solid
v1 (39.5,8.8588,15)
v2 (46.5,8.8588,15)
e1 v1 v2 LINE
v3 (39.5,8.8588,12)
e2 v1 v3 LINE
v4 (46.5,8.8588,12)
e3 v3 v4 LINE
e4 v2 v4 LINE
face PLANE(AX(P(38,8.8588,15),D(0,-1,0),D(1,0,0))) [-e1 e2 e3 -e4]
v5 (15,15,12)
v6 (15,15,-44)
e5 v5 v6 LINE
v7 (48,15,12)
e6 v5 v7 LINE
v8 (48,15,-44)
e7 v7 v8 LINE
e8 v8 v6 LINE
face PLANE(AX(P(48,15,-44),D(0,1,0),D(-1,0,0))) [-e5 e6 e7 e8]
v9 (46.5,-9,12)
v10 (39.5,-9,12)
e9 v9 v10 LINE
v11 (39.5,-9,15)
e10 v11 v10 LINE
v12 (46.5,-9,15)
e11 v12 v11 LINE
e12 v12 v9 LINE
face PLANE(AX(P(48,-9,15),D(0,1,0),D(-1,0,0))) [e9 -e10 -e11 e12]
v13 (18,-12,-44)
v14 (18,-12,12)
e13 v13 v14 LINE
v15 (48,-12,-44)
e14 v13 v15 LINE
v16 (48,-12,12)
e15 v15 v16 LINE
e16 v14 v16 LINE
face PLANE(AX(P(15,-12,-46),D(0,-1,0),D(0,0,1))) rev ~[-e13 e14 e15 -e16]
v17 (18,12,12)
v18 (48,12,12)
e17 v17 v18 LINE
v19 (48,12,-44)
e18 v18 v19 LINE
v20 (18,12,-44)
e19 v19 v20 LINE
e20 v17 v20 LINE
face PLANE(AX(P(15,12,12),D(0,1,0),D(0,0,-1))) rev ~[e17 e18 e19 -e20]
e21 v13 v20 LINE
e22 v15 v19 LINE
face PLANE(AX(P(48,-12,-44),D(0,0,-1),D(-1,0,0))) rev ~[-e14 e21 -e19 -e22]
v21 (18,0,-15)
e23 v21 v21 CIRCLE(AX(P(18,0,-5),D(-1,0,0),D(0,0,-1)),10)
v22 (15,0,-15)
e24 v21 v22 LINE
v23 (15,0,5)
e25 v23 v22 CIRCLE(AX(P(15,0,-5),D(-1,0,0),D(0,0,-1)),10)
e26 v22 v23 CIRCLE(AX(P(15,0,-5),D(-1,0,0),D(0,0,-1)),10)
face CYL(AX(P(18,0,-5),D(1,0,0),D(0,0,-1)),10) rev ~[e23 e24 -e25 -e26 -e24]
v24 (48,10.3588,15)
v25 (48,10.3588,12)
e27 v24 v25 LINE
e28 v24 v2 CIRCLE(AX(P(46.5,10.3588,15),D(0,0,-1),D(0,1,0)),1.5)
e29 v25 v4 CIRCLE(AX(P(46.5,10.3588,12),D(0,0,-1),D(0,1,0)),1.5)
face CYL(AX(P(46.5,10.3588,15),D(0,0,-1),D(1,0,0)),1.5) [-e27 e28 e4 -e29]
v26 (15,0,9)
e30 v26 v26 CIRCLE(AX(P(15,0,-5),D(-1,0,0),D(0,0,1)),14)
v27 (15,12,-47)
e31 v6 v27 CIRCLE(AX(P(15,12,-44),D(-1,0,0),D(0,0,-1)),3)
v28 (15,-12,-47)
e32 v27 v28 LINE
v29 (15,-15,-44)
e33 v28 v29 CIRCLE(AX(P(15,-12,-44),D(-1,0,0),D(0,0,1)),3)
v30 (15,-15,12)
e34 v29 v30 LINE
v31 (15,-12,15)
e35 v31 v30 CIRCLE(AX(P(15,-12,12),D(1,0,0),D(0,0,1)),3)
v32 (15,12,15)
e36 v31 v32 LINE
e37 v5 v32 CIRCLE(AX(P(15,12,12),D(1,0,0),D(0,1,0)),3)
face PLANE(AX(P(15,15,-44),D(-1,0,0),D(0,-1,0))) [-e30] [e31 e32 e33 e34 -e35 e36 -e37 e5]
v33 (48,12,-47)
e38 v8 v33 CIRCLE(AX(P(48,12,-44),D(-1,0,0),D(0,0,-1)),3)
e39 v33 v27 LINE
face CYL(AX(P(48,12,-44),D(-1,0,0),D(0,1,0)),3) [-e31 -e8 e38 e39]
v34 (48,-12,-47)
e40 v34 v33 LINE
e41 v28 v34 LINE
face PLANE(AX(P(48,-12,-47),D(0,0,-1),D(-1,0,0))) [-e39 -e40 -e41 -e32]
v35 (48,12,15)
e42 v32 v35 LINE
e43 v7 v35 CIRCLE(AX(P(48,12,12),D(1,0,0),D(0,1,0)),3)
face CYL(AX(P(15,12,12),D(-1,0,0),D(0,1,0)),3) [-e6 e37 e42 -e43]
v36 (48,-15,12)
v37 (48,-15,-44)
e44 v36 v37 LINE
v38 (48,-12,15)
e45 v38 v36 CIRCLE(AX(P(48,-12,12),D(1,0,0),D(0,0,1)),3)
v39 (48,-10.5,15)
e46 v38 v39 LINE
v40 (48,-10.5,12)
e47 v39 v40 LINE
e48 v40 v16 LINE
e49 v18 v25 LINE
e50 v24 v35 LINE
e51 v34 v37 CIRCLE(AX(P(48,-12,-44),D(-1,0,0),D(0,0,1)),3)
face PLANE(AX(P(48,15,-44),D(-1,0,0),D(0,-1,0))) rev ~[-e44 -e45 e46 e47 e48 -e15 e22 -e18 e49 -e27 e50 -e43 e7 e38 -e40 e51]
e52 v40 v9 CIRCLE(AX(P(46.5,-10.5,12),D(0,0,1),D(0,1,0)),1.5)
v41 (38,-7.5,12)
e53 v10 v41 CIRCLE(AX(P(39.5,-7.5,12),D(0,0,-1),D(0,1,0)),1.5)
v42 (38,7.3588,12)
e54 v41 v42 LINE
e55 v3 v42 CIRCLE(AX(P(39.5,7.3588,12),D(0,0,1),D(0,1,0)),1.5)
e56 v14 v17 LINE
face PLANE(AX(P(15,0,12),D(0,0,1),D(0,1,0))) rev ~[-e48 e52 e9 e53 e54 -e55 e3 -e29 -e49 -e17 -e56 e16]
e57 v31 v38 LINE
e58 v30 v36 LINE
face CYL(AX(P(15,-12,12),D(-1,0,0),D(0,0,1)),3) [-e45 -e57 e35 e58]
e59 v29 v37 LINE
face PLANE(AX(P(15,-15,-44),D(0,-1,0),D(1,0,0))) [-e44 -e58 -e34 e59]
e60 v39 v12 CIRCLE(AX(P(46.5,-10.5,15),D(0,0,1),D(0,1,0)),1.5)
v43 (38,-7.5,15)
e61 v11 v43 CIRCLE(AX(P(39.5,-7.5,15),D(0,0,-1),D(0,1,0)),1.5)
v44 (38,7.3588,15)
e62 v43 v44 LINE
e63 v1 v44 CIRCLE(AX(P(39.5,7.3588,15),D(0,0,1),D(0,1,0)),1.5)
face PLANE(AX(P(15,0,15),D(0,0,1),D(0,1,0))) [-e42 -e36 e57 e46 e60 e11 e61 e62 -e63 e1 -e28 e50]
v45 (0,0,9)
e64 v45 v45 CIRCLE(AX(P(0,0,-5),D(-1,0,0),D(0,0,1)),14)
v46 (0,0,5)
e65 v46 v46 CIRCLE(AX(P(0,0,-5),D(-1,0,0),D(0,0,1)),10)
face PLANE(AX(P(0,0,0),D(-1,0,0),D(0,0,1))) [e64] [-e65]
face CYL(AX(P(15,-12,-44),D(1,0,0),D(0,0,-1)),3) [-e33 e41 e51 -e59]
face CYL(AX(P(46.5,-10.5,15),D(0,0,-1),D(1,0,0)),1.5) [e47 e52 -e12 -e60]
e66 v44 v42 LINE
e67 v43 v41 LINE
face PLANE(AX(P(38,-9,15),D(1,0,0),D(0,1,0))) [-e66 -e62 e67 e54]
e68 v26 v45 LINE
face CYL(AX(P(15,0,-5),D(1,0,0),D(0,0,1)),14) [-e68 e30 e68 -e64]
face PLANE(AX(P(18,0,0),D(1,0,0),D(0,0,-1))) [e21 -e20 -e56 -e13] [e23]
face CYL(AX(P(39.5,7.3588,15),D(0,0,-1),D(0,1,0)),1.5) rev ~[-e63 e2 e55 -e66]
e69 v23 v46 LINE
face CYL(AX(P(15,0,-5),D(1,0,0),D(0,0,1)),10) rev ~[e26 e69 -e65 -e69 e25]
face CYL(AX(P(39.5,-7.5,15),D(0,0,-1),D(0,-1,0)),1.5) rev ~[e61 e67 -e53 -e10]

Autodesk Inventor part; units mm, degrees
ref_plane "YZ Plane" through (0, 0, 0) normal (1, 0, 0) x (0, 1, 0)
ref_plane "XZ Plane" through (0, 0, 0) normal (0, 1, 0) x (-1, 0, 0)
ref_plane "XY Plane" through (0, 0, 0) normal (0, 0, 1) x (1, 0, 0)
sketch "Sketch1" plane through (0, 0, 0) normal (1, 0, 0) x (0, 1, 0)
  circle A0 centre (0, 0) radius 10
  circle A1 centre (0, 0) radius 14
  dimension "d0" = 20
  dimension "d1" = 28
extrude "Extrusion1" add sketch "Sketch1" along normal blind 15
sketch "Sketch2" plane through (15, 0, 0) normal (1, 0, 0) x (0, 0, -1)
  point P0 (0, 0)
sketch "Sketch3" plane through (15, 0, 0) normal (1, 0, 0) x (0, 0, -1)
  circle A0 centre (0, 0) radius 10 projected
  line L0 (-12, 0) -> (-12, 12)
  line L1 (-12, 12) -> (46, 12)
  line L2 (46, 12) -> (46, -12)
  line L3 (46, -12) -> (-12, -12)
  line L4 (-12, -12) -> (-12, 0)
  line L5 (-15, 0) -> (-15, -12)
  line L6 (-15, 0) -> (-15, 12)
  line L7 (-12, 15) -> (46, 15)
  line L8 (49, 12) -> (49, -12)
  line L9 (46, -15) -> (-12, -15)
  arc A1 (49, 12) -> (46, 15) centre (46, 12) ccw
  arc A2 (46, -15) -> (49, -12) centre (46, -12) ccw
  arc A3 (-15, -12) -> (-12, -15) centre (-12, -12) ccw
  arc A4 (-12, 15) -> (-15, 12) centre (-12, 12) ccw
extrude "Extrusion2" add sketch "Sketch3" along normal blind 33 contours L6 A4 L7 A1 L8 A2 L9 A3 L5
sketch "Sketch4" plane through (15, 0, 0) normal (1, 0, 0) x (0, 0, -1)
  line L0 (-12, -12) -> (-12, 12) projected
  line L1 (7.2111, 12) -> (46, 12) projected
  line L2 (-12, 12) -> (46, 12)
  line L3 (46, 12) -> (46, -12)
  line L4 (46, -12) -> (-12, -12) projected
  line L5 (46, -12) -> (-12, -12)
  line L6 (-12, 12) -> (46, 12) projected
  line L7 (-12, -12) -> (-12, 12)
  point P0 (0, 0)
extrude "Extrusion3" add sketch "Sketch4" along normal blind 3
sketch "Sketch5" plane through (15, 0, 0) normal (-1, 0, 0) x (0, 0, 1)
  circle A0 centre (0, 0) radius 10
extrude "Extrusion4" cut sketch "Sketch5" against normal blind 3
sketch "Sketch6" plane through (15, -12, -49) normal (0, 0, -1) x (-1, 0, 0)
  point P0 (15, 12)
sketch "Sketch7" plane through (15, -12, -49) normal (0, 0, -1) x (-1, 0, 0)
  line L0 (0, 0) -> (0, -3) projected
  line L1 (0, -3) -> (0, 27)
  point P0 (15, 12)
  dimension "d22" = 30
sketch "Sketch8" plane through (15, -12, -49) normal (0, 0, -1) x (-1, 0, 0)
  point P0 (0, -3)
  point P1 (-3, 0)
sketch "Sketch9" plane through (15, -12, -49) normal (0, 0, -1) x (-1, 0, 0)
  line L0 (0, 27) -> (0, 24) projected
  line L1 (0, 27) -> (-64, 27)
  line L2 (-64, 27) -> (-64, -3)
  line L3 (0, -3) -> (-33, -3) projected
  line L4 (-64, -3) -> (0, -3)
  line L5 (0, -3) -> (0, 27)
  line L6 (0, 0) -> (0, 24) projected
  line L7 (-3, 24) -> (-3, 0) projected
  line L8 (-3, 0) -> (-3, 24)
  line L9 (0, 24) -> (-33, 24) projected
  line L10 (-3, 24) -> (-61, 24)
  line L11 (-61, 24) -> (-61, 0)
  line L12 (-61, 0) -> (-3, 0)
  line L13 (0, 0) -> (-33, 0) projected
  point P0 (15, 12)
  dimension "d27" = 64
  dimension "d28" = 30
  dimension "d29" = 58
extrude "Extrusion5" add sketch "Sketch9" along normal blind 30 contours L0 L9 L10 L11 L12 L13 L5 L3 L4 L2 L1 | L5 L13 L7 L9
sketch "Sketch10" plane through (48, 12, -49) normal (0, 0, -1) x (-1, 0, 0)
  line L0 (33, 3) -> (-31, 3) projected
  line L1 (33, 3) -> (33, 0) projected
  line L2 (-31, 3) -> (33, 3)
  line L3 (33, 3) -> (33, -27)
  line L4 (33, 0) -> (33, -24) projected
  line L5 (-31, 3) -> (-31, -27) projected
  line L6 (33, -27) -> (-31, -27)
  line L7 (-31, -27) -> (-31, 3)
  point P0 (48, -12)
  dimension "d32" = 30
extrude "Extrusion6" add sketch "Sketch10" against normal blind 5
fillet "Fillet1" radius 3 2 edges at (79, 15, -61.5) (79, -15, -61.5)
sketch "Sketch11" plane through (48, 12, -44) normal (0, 0, 1) x (1, 0, 0)
  line L0 (31, -24) -> (31, 0) projected
  line L1 (31, -12) -> (29, -12)
  line L2 (29, -12) -> (19, -12)
  circle A0 centre (19, -12) radius 10
  point P0 (-48, -12)
  dimension "d36" = 2
  dimension "d37" = 10
extrude "Extrusion7" cut sketch "Sketch11" against normal blind 10.5
sketch "Sketch12" plane through (48, 12, -44) normal (0, 0, 1) x (1, 0, 0)
  arc A0 (28, -7.6411) -> (28, -16.3589) centre (19, -12) ccw projected
  circle A1 centre (19, -12) radius 10
  circle A2 centre (19, -12) radius 10 projected
  circle A3 centre (19, -12) radius 14
  point P0 (-48, -12)
  point P1 (28, -16.3589)
  dimension "d40" = 28
extrude "Extrusion8" add sketch "Sketch12" along normal blind 15
sketch "Sketch13" plane through (15, -12, 15) normal (0, 0, 1) x (1, 0, 0)
  line L0 (33, 0) -> (3, 0) projected
  line L1 (0, -3) -> (33, -3) projected
  line L2 (30.6116, 0) -> (33.6116, 0) construction
  line L3 (33, 0) -> (33, 24) projected
  line L4 (33, 3) -> (23, 3)
  line L5 (23, 3) -> (23, 20.8588)
  line L6 (23, 20.8588) -> (33, 20.8588)
  point P0 (-15, 12)
extrude "Extrusion9" cut sketch "Sketch13" against normal blind 21.75
sketch "Sketch14" plane through (79, -12, -79) normal (1, 0, 0) x (0, 0, -1)
  line L0 (-35, 24) -> (0, 24) projected
  line L1 (-3.7826, 24) -> (-0.7826, 24) construction
  line L2 (0, 0) -> (-35, 0) projected
  line L3 (-3.2489, 0) -> (-0.2489, 0) construction
  line L4 (0, 24) -> (0, 0) projected
  line L5 (0, 3) -> (-10, 3)
  line L6 (0, 3) -> (10, 3) construction
  line L7 (-10, 3) -> (-10, 21)
  line L8 (-10, 21) -> (0, 21)
  point P0 (-79, 12)
  dimension "d53" = 10
  dimension "d54" = 180
extrude "Extrusion10" cut sketch "Sketch14" against normal blind 25.75
sketch "Sketch15" plane through (15, -12, -79) normal (0, 0, -1) x (-1, 0, 0)
  line L0 (8.5716, 47.3564) -> (-2.6139, -49.713)
  line L1 (-2.6139, -49.713) -> (-66.1269, -32.0991)
  line L2 (-66.1269, -32.0991) -> (-83.6498, 8.8041)
  line L3 (-83.6498, 8.8041) -> (-71.64, 52.1092)
  line L4 (-71.64, 52.1092) -> (-17.9136, 47.3564)
  arc A0 (-17.9136, 47.3564) -> (-17.9136, 47.3564) centre (-16.407, 64.3867) ccw
  line L5 (-17.9136, 47.3564) -> (8.5716, 47.3564)
  point P0 (15, 12)
extrude "Extrusion11" cut sketch "Sketch15" against normal blind 30 contours L0 L1 L2 L3 L4 A0 L5 | A0 L5 picked at (-16.2394, 47.3367)
sketch "Sketch16" plane through (15, 15, 12) normal (0, 1, 0) x (1, 0, 0)
  line L0 (33, 56) -> (33, 0) projected
  line L1 (33, 35.3995) -> (33, 94.1554)
  line L2 (33, 94.1554) -> (79.7551, 84.127)
  line L3 (79.7551, 84.127) -> (69.5982, 12)
  line L4 (69.5982, 12) -> (67.3209, 12.3207)
  line L5 (67.3209, 12.3207) -> (33, 35.3995)
  point P0 (-15, 12)
extrude "Extrusion12" cut sketch "Sketch16" against normal blind 77.25
sketch "Sketch18" plane through (48, -15, -49) normal (0, 0, -1) x (-1, 0, 0)
  point P0 (48, 15)
fillet "Fillet2" radius 3 2 edges at (31.5, 15, -49) (31.5, -15, -49)
sketch "Sketch19" plane through (48, -12, -49) normal (0, 0, -1) x (-1, 0, 0)
  line L0 (-10.3978, 34.6876) -> (55.1217, 36.4172)
  line L1 (55.1217, 36.4172) -> (42.8113, -19.5389)
  line L2 (42.8113, -19.5389) -> (-1.2413, -25.4397)
  arc A0 (-1.2413, -25.4397) -> (-3.1744, -22.4893) centre (-5.2865, -25.9815) ccw
  line L3 (-3.1744, -22.4893) -> (-13.3482, 5.1835)
  arc A1 (-13.3482, 5.1835) -> (-11.3134, 8.4392) centre (-14.4287, 8.1225) ccw
  line L4 (-11.3134, 8.4392) -> (-10.3978, 34.6876)
  point P0 (48, 12)
extrude "Extrusion13" cut sketch "Sketch19" against normal blind 5
sketch "Sketch20" plane through (48, -12, -44) normal (0, 0, -1) x (-1, 0, 0)
  line L0 (0, 27) -> (0, 24) projected
  line L1 (0, 27) -> (33, 27)
  line L2 (33, 0) -> (33, -3) projected
  line L3 (33, 27) -> (33, -3)
  line L4 (33, -3) -> (0, -3) projected
  line L5 (33, -3) -> (0, -3)
  line L6 (0, -3) -> (0, 27)
  point P0 (48, 12)
extrude "Extrusion14" add sketch "Sketch20" along normal blind 3
fillet "Fillet3" radius 3 2 edges at (31.5, 15, -47) (31.5, -15, -47)
fillet "Fillet4" radius 1.5 4 edges at (48, 8.8588, 13.5) (38, 8.8588, 13.5) (38, -9, 13.5) (48, -9, 13.5)
sketch "Sketch21" plane through (18, 0, 0) normal (1, 0, 0) x (0, 0, -1)
  arc A0 (-12, 15) -> (-15, 12) centre (-12, 12) ccw projected
  line L0 (44, -12) -> (44, 12) projected
  line L1 (-12, 12) -> (44, 12)
  line L2 (44, -12) -> (-12, -12) projected
  line L3 (44, 12) -> (44, -12)
  arc A1 (-15, -12) -> (-12, -15) centre (-12, -12) ccw projected
  line L4 (44, -12) -> (-12, -12)
  line L5 (-12, -12) -> (-12, 12)
  point P0 (0, 0)
sketch "Sketch22" plane through (18, 0, 0) normal (1, 0, 0) x (0, 0, -1)
  line L0 (44, -12) -> (44, 12) projected
  line L1 (-12, 12) -> (44, 12)
  line L2 (44, 12) -> (44, -12)
  line L3 (44, -12) -> (-12, -12)
  line L4 (-12, -12) -> (-12, 12)
  point P0 (0, 0)
extrude "Extrusion15" add sketch "Sketch22" against normal blind 3
sketch "Sketch23" plane through (18, 0, 0) normal (1, 0, 0) x (0, 0, -1)
  line L0 (-12, -12) -> (-12, 12) projected
  line L1 (-12, 0) -> (5, 0)
  circle A0 centre (5, 0) radius 10
  point P0 (0, 0)
  dimension "d70" = 17
  dimension "d71" = 20
extrude "Extrusion16" cut sketch "Sketch23" against normal blind 3
sketch "Sketch24" plane through (0, 0, 0) normal (-1, 0, 0) x (0, 0, 1)
  line L0 (-21.5497, 18.4099) -> (24.0724, 14.8138)
  line L1 (24.0724, 14.8138) -> (25.1995, -10.9493)
  arc A0 (24.636, -12.5058) -> (25.1995, -10.9493) centre (23.0304, -11.0442) ccw
  line L2 (24.636, -12.5058) -> (-2.6031, -20.2884)
  line L3 (-2.6031, -20.2884) -> (-17.1486, -15)
  line L4 (12, -15) -> (-44, -15) projected
  line L5 (-22.4064, 12.7803) -> (-21.5497, 18.4099)
  arc A1 (-27.4001, -10.9493) -> (-22.4064, 12.7803) centre (-235.0665, 45.1424) ccw
  line L6 (-27.4001, -10.9493) -> (-32.7657, -10.1328)
  arc A2 (-32.7657, -10.1328) -> (-27.9368, -19.5907) centre (-33.7493, -16.5967) ccw
  line L7 (-27.9368, -19.5907) -> (-17.1486, -15)
  point P0 (0, 0)
  point P1 (-40.0897, -15)
extrude "Extrusion17" cut sketch "Sketch24" against normal blind 15 contours L0 L1 A0 L2 L3 L4 A2 L6 A1 L5
sketch "Sketch25" plane through (15, 0, 0) normal (-1, 0, 0) x (0, 0, 1)
  circle A0 centre (-5, 0) radius 10 projected
  circle A1 centre (-5, 0) radius 10
  circle A2 centre (-5, 0) radius 14
  point P0 (0, 0)
  dimension "d76" = 28
extrude "Extrusion18" add sketch "Sketch25" along normal blind 15
sketch "Sketch26" plane through (48, 0, 0) normal (1, 0, 0) x (0, 0, -1)
  point P0 (0, 0)
properties part number "servo holder 1"
